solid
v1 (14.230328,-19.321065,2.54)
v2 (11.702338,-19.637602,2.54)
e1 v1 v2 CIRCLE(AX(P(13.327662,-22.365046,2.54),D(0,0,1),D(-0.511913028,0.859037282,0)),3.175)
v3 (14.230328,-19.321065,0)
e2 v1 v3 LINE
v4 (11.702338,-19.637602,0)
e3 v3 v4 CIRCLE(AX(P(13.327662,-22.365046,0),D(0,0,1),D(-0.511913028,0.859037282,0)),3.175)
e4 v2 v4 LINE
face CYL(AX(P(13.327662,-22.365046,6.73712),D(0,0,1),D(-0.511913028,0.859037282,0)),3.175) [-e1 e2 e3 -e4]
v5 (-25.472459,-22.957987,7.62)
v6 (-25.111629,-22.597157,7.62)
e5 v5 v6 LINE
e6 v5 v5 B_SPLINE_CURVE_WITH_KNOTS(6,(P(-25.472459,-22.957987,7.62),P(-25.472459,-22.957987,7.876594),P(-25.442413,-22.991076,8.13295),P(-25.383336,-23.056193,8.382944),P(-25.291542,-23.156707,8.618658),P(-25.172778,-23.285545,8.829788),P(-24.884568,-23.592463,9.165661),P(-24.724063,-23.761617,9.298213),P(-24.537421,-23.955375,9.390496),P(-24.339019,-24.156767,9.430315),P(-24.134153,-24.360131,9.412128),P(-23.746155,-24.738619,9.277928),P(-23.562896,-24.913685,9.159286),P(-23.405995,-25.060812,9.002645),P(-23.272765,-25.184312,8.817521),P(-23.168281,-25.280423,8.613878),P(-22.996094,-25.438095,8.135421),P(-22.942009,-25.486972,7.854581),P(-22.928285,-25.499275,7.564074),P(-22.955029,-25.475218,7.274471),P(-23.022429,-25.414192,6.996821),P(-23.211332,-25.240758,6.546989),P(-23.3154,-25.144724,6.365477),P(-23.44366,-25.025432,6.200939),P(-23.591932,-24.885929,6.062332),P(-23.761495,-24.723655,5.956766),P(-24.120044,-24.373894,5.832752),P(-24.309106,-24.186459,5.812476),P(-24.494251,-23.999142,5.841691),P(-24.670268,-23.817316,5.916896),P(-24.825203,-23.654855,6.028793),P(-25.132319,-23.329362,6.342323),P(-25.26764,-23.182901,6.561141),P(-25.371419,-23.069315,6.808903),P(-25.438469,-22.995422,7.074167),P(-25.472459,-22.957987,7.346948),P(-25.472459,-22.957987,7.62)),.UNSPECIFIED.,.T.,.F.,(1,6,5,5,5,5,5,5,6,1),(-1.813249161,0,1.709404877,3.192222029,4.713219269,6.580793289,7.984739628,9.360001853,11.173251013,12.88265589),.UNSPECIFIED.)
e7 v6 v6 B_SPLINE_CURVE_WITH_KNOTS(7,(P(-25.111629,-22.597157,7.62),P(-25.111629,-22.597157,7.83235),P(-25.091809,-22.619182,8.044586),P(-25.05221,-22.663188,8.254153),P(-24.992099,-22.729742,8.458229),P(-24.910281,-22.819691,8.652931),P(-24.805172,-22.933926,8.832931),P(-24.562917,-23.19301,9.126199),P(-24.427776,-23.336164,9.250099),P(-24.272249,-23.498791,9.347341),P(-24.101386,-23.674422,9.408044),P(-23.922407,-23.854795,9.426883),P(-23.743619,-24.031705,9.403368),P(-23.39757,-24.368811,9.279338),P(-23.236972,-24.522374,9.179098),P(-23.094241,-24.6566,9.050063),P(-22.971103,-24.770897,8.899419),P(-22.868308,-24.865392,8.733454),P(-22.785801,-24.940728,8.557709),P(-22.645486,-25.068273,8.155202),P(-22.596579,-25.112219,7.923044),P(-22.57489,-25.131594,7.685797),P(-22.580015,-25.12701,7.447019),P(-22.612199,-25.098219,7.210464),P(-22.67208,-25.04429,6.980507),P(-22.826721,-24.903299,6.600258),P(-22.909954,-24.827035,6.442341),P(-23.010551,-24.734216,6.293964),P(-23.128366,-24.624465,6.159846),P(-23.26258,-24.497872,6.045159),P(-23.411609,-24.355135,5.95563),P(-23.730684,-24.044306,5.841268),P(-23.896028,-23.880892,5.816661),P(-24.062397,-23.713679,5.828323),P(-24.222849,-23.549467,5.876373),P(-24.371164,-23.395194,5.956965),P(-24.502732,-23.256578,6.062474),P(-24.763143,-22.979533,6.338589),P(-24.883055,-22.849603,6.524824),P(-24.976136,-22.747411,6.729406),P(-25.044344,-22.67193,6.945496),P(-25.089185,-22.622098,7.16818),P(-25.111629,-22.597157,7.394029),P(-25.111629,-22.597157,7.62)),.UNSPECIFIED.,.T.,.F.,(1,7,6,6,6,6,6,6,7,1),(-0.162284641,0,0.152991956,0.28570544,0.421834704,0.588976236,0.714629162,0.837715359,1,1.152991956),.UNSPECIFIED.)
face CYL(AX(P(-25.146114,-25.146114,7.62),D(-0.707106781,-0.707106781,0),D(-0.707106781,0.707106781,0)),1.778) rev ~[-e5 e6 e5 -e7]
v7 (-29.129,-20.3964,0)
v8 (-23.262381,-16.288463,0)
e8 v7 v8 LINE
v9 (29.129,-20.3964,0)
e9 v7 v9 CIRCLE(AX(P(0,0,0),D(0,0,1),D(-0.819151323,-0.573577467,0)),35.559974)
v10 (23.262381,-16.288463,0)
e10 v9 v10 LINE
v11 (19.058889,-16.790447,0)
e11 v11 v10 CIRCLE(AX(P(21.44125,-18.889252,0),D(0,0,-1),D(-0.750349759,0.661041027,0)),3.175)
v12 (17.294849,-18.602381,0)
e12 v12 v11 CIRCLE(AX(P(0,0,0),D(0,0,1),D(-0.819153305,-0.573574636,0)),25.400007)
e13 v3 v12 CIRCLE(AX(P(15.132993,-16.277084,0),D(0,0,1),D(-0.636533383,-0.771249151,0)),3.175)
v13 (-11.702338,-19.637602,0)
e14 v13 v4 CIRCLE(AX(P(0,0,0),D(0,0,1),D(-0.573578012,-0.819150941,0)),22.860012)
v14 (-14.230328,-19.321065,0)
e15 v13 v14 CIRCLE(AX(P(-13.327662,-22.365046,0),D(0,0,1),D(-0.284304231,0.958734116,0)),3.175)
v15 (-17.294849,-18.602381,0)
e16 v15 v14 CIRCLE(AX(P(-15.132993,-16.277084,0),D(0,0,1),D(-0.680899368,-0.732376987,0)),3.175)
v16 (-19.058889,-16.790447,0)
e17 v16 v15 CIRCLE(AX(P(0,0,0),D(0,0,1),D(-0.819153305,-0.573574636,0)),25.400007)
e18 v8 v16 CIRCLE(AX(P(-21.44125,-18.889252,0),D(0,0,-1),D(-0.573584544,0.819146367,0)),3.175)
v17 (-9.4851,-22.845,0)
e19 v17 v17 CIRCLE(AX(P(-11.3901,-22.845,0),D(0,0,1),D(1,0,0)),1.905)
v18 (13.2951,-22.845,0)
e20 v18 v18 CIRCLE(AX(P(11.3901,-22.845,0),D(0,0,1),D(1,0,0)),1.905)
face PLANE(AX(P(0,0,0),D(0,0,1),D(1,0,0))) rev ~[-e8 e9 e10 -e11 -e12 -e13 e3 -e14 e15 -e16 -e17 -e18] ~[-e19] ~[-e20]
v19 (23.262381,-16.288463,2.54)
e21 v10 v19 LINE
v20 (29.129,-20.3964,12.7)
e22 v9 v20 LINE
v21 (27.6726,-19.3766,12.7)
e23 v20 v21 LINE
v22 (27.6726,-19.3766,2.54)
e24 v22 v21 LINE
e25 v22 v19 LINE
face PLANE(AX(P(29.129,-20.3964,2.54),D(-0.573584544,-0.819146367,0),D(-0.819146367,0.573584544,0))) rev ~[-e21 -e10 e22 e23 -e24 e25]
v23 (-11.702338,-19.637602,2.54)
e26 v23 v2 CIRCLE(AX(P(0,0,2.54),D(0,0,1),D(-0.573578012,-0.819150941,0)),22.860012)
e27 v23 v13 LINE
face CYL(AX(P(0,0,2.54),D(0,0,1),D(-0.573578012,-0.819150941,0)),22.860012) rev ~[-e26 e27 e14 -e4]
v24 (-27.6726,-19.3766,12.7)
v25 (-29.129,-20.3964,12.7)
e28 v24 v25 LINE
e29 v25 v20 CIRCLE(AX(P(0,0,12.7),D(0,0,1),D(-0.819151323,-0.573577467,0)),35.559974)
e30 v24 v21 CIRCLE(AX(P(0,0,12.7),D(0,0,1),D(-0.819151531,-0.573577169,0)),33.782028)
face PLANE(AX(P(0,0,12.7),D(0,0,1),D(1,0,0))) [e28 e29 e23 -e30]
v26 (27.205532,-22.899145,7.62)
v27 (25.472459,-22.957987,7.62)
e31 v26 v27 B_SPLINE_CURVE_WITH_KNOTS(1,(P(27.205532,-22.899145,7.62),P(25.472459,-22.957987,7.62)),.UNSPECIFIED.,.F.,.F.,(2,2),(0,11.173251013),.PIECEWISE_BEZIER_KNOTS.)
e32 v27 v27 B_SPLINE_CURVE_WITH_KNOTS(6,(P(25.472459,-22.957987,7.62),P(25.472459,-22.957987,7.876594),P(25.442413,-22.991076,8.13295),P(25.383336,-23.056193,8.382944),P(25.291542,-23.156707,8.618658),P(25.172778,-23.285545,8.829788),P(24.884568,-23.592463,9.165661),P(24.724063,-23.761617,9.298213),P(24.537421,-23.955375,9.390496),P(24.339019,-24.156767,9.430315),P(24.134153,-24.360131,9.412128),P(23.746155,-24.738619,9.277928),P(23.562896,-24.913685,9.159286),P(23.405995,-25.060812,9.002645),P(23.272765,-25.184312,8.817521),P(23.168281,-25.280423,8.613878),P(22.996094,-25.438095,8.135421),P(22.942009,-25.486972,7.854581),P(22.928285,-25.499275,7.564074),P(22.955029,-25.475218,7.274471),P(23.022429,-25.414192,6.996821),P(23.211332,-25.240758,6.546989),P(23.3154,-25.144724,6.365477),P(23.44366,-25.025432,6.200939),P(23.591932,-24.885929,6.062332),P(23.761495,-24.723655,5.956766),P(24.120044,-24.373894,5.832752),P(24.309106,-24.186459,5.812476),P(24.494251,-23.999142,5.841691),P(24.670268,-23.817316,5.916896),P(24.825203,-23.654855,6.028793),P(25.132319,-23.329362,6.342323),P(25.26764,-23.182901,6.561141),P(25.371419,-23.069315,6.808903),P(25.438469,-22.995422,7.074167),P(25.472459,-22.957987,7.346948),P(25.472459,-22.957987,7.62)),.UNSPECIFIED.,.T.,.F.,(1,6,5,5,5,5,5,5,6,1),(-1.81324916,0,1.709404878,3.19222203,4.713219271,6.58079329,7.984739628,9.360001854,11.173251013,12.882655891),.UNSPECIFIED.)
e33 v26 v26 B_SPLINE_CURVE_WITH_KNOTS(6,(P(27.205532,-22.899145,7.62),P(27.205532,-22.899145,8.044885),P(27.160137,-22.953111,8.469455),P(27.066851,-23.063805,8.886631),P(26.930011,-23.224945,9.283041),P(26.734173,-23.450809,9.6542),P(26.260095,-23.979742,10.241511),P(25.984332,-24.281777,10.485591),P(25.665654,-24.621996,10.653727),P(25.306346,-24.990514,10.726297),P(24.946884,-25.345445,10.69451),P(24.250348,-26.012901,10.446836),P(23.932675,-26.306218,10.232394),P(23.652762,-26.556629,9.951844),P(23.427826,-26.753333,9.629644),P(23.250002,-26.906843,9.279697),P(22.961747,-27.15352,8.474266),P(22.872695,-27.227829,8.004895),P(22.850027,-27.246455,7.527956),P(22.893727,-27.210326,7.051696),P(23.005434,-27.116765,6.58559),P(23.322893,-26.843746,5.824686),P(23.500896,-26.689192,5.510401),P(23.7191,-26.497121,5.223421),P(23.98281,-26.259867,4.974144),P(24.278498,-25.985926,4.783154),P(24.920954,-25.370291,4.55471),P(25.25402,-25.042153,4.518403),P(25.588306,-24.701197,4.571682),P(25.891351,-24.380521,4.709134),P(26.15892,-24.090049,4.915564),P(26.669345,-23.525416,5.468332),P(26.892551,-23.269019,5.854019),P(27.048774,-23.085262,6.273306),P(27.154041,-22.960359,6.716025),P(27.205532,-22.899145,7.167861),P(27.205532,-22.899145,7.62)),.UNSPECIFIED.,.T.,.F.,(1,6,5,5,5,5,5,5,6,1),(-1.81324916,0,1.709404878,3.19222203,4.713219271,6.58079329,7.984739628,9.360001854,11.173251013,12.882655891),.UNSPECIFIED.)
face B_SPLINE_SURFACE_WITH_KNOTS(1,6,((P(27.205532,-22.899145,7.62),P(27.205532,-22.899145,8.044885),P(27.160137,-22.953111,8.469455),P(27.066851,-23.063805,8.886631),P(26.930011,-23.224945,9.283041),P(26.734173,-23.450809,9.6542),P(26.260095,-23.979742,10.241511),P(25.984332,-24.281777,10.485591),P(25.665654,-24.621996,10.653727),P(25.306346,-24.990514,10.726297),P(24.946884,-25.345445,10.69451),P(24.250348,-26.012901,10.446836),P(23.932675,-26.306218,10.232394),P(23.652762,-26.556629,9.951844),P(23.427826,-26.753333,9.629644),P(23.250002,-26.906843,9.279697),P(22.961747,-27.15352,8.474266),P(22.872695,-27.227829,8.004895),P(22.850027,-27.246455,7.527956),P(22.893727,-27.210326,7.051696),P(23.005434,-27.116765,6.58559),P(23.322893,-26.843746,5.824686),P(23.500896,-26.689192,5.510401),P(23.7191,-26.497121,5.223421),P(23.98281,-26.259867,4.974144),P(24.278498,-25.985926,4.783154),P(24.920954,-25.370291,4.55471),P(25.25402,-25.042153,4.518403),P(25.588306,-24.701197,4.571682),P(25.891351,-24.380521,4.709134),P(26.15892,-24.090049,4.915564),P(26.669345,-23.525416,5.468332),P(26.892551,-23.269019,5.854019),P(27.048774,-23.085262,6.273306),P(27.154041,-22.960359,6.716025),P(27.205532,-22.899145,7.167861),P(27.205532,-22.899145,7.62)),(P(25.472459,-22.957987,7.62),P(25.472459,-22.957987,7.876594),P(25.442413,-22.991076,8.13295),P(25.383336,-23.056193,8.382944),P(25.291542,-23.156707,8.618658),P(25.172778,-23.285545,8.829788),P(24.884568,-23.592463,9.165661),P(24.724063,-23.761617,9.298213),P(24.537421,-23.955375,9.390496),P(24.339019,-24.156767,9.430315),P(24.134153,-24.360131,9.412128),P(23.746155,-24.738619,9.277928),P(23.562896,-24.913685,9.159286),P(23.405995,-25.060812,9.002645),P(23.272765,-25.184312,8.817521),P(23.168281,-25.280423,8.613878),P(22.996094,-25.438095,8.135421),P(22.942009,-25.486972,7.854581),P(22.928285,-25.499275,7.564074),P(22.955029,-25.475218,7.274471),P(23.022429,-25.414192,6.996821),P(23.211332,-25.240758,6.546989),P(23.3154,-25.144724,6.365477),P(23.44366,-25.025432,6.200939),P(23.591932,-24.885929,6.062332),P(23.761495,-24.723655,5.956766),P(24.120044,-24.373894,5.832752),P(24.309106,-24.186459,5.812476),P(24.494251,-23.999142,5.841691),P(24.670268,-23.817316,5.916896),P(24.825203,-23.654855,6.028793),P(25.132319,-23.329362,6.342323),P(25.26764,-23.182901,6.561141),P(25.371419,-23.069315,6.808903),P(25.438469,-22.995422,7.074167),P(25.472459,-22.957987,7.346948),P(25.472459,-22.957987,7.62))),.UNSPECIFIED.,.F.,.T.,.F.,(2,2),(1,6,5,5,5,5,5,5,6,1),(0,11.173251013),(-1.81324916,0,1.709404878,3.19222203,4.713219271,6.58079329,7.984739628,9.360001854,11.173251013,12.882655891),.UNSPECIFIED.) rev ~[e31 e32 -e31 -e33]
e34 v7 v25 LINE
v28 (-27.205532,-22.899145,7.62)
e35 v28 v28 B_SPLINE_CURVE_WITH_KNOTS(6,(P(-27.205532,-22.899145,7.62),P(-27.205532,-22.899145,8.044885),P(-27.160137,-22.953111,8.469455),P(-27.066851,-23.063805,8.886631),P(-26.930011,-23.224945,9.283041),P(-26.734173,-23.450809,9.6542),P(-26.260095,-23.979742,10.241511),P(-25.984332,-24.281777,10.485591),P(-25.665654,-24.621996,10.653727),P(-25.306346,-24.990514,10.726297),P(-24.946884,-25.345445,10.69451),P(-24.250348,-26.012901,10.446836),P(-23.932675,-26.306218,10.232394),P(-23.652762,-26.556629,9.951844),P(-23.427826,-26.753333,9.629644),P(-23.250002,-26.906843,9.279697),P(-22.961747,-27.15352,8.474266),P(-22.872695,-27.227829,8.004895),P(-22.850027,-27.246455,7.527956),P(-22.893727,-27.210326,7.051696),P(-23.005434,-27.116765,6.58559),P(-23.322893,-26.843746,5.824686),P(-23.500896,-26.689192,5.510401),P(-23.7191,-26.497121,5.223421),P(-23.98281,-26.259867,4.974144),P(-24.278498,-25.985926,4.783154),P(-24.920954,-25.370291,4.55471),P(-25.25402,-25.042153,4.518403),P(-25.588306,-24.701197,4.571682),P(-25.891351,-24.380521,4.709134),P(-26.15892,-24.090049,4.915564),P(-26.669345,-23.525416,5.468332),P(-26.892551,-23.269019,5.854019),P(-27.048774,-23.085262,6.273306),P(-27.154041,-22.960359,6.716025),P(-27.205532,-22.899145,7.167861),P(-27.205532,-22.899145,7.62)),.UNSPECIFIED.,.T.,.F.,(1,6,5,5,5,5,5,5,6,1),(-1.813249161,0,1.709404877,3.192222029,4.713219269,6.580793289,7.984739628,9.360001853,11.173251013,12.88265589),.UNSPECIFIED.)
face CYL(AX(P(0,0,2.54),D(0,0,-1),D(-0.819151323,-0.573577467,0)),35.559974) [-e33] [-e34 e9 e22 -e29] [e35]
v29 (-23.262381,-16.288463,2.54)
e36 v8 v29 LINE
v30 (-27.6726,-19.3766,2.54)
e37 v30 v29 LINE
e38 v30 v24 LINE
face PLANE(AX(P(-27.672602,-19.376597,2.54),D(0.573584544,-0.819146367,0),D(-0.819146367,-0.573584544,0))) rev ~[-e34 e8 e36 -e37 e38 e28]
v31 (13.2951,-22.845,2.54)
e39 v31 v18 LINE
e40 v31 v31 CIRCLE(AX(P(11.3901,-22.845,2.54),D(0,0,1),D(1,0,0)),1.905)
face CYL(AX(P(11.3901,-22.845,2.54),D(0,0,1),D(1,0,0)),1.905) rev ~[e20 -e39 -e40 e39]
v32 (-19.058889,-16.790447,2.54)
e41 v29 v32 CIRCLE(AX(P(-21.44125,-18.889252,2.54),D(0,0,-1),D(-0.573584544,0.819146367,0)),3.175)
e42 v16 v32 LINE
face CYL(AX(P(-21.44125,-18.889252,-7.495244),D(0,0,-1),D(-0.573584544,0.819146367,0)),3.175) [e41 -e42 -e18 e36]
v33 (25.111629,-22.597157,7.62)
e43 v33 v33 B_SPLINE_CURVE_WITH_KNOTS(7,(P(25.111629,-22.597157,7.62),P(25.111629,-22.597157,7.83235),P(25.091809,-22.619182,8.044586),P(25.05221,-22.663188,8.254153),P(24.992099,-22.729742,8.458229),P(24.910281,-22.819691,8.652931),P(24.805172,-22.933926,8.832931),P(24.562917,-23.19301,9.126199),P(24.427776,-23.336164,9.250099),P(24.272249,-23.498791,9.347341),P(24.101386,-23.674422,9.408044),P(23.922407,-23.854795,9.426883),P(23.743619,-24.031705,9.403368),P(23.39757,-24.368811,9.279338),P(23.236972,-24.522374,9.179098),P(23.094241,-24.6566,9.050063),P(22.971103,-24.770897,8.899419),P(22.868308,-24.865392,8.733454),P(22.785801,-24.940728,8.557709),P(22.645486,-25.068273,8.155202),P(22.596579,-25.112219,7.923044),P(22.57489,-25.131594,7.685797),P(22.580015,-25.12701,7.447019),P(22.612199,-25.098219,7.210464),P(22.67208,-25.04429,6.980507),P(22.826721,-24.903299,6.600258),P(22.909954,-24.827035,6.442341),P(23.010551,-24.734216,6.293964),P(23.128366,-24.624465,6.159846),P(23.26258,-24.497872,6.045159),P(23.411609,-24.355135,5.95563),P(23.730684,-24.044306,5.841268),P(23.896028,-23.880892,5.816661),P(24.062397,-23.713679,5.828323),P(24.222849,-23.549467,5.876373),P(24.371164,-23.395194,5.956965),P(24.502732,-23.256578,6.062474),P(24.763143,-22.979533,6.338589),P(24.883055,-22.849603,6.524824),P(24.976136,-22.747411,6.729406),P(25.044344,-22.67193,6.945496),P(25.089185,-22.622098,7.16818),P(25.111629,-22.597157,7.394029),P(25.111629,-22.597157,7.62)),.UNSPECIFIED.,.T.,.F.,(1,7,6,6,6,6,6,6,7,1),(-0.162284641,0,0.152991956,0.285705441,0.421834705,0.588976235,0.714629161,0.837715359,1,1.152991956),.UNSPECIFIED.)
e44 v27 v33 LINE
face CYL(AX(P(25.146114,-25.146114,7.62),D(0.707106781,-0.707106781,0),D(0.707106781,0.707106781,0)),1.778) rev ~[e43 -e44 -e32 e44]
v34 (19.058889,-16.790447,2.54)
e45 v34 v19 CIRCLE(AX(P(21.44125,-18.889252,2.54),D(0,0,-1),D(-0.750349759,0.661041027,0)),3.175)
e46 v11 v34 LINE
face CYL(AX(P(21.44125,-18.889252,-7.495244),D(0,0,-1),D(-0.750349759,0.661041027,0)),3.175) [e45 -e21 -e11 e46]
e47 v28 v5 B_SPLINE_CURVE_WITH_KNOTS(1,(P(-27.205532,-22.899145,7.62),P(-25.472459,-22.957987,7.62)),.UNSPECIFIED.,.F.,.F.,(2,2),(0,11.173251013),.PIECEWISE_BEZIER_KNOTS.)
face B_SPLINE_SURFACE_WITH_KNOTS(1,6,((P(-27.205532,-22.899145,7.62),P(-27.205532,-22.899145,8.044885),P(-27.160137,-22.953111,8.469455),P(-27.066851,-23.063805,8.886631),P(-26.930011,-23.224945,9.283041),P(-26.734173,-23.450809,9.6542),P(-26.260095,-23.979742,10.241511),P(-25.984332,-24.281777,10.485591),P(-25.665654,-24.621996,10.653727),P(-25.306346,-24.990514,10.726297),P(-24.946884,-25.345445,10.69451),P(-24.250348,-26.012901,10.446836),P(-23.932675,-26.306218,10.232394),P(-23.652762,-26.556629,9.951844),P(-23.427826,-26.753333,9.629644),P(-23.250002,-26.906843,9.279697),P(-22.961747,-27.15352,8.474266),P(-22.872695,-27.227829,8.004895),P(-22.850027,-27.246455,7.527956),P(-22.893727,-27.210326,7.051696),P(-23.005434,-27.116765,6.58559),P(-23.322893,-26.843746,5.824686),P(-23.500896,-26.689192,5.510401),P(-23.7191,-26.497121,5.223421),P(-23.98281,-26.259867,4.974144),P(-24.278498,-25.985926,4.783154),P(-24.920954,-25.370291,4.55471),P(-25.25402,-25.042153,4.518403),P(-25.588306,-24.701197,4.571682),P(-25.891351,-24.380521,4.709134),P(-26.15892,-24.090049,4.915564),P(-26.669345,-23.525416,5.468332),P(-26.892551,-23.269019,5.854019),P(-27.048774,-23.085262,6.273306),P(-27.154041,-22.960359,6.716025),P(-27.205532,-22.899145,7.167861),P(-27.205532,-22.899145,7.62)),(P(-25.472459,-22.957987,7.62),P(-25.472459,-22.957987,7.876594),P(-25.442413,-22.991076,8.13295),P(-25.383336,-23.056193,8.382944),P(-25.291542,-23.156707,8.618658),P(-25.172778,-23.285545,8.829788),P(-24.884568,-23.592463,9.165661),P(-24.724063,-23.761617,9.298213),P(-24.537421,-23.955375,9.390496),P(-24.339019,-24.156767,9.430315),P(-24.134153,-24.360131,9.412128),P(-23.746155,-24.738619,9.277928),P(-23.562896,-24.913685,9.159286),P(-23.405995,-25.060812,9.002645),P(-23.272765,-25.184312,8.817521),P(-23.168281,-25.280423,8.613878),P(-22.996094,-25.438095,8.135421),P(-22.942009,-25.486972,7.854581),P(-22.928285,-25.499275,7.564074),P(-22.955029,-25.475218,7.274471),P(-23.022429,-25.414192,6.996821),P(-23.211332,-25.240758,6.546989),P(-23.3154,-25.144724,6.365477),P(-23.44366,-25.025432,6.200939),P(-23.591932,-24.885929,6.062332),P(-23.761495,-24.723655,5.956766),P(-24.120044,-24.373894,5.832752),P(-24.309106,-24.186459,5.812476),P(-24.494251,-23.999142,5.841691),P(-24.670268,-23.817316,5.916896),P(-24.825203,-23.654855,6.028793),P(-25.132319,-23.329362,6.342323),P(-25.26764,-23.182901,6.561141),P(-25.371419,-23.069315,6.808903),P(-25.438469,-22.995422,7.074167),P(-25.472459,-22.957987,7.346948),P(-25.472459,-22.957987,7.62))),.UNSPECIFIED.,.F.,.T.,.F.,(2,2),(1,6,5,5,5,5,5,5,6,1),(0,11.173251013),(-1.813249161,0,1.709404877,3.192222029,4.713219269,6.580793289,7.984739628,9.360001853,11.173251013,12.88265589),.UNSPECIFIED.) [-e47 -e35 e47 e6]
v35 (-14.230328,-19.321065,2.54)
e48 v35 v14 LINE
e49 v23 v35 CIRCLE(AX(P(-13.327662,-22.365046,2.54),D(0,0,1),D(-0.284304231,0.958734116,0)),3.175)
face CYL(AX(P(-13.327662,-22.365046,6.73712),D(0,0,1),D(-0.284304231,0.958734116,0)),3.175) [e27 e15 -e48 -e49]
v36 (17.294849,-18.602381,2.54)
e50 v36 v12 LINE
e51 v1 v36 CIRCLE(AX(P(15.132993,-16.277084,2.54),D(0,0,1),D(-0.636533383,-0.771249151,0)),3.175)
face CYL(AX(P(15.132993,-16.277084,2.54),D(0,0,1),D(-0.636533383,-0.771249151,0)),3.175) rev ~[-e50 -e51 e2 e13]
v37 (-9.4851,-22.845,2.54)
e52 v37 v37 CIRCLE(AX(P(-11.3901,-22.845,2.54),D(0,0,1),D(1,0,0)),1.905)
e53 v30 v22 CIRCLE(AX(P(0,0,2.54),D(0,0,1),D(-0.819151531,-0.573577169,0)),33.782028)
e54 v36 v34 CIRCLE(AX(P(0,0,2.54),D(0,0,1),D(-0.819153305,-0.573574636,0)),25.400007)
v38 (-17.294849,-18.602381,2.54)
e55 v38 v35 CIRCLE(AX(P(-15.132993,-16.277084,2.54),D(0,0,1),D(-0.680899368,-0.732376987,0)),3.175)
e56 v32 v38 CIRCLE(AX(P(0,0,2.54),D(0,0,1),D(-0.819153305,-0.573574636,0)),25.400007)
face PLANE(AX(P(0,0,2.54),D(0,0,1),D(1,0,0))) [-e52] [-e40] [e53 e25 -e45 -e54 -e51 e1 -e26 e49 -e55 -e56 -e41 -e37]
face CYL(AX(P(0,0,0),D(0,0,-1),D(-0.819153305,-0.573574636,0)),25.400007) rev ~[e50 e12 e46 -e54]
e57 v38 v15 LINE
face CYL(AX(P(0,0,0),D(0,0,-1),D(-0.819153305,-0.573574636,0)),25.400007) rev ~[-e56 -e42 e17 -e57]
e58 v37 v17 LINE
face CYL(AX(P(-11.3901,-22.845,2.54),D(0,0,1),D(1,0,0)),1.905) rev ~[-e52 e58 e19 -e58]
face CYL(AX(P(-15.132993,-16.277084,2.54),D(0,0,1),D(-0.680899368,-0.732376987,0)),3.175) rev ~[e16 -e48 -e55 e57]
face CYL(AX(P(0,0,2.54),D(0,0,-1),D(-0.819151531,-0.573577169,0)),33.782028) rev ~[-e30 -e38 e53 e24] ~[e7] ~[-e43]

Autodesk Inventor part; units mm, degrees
ref_plane "XZ Plane" through (0, 0, 0) normal (0, 1, 0) x (-1, 0, 0)
sketch "Sketch1" plane through (0, 0, 0) normal (0, 0, 1) x (1, 0, 0)
  arc A0 (-20.8065, -14.5688) -> (20.8065, -14.5688) centre (0, 0) ccw
  arc A1 (-29.129, -20.3964) -> (29.129, -20.3964) centre (0, 0) ccw
  line L0 (-29.129, -20.3964) -> (-20.8065, -14.5688)
  line L1 (29.129, -20.3964) -> (20.8065, -14.5688)
  line L2 (-20.8065, -14.5688) -> (20.8065, -14.5688) construction
  dimension "d0" = 50.8
  dimension "d2" = 71.12
  dimension "d3" = 110
extrude "Extrusion1" add sketch "Sketch1" along normal blind 2.54
sketch "Sketch2" plane through (0, 0, 2.54) normal (0, 0, 1) x (1, 0, 0)
  arc A0 (-20.8065, -14.5688) -> (20.8065, -14.5688) centre (0, 0) ccw projected
  line L0 (-14.5688, -20.8065) -> (-13.112, -18.7258)
  line L1 (14.5688, -20.8065) -> (13.112, -18.7258)
  arc A1 (-13.112, -18.7258) -> (13.112, -18.7258) centre (0, 0) ccw
  line L2 (-14.5688, -20.8065) -> (14.5688, -20.8065) construction
  dimension "d6" = 2.54
  dimension "d13" = 70
extrude "Extrusion2" add sketch "Sketch2" against normal blind 2.54
sketch "Sketch3" plane through (0, 0, 2.54) normal (0, 0, 1) x (1, 0, 0)
  circle A0 centre (-11.3901, -22.845) radius 1.905
  circle A1 centre (11.3901, -22.845) radius 1.905
  line L0 (-11.3901, -22.845) -> (11.3901, -22.845) construction
  point P0 (0, 0)
  point P1 (0, -22.845)
  dimension "d9" = 3.81
  dimension "d10" = 3.81
  dimension "d11" = 25.527
  dimension "d12" = 26.5
extrude "Extrusion3" cut sketch "Sketch3" against normal through all
sketch "Sketch4" plane through (0, 0, 2.54) normal (0, 0, 1) x (1, 0, 0)
  circle A0 centre (-11.3901, -22.845) radius 1.905 projected
  circle A1 centre (11.3901, -22.845) radius 1.905 projected
  arc A2 (-29.129, -20.3964) -> (29.129, -20.3964) centre (0, 0) ccw projected
  line L0 (29.129, -20.3964) -> (20.8065, -14.5688) projected
  arc A3 (14.5688, -20.8065) -> (20.8065, -14.5688) centre (0, 0) ccw projected
  line L1 (14.5688, -20.8065) -> (13.112, -18.7258) projected
  arc A4 (-13.112, -18.7258) -> (13.112, -18.7258) centre (0, 0) ccw projected
  line L2 (-13.112, -18.7258) -> (-14.5688, -20.8065) projected
  arc A5 (-20.8065, -14.5688) -> (-14.5688, -20.8065) centre (0, 0) ccw projected
  line L3 (-20.8065, -14.5688) -> (-29.129, -20.3964) projected
  line L4 (-20.8065, -14.5688) -> (-29.129, -20.3964) projected
  line L5 (29.129, -20.3964) -> (20.8065, -14.5688) projected
  arc A6 (-27.6726, -19.3766) -> (27.6726, -19.3766) centre (0, 0) ccw
  dimension "d17" = 67.564
extrude "Extrusion4" add sketch "Sketch4" along normal blind 10.16 contours L3 A6 L0 A2
ref_plane "Work Plane2" through (25.1447, -25.1447, 0) normal (0.7071068, -0.7071068, 0) x (0.7071068, 0.7071068, 0)
ref_plane "Work Plane1" through (0, 0, 2.54) normal (0.7071068, -0.7071068, 0) x (0, 0, -1)
ref_plane "Work Plane4" through (-25.1447, -25.1447, 0) normal (0.7071068, 0.7071068, 0) x (-0.7071068, 0.7071068, 0)
ref_plane "Work Plane3" through (0, 0, 2.54) normal (0.7071068, 0.7071068, 0) x (0, 0, -1)
sketch "Sketch5" plane through (-25.1447, -25.1447, 0) normal (0.7071068, 0.7071068, 0) x (-0.7071068, 0.7071068, 0)
  circle A0 centre (0, 7.62) radius 1.778
  line L0 (5.8662, 2.54) -> (5.8662, 12.7) projected
  point P0 (0, 0)
  point P1 (6.1749, 4.826)
  point P2 (5.8662, 7.62)
  dimension "d22" = 3.556
extrude "Extrusion5" cut sketch "Sketch5" along normal blind 7.112
sketch "Sketch6" plane through (25.1447, -25.1447, 0) normal (0.7071068, -0.7071068, 0) x (0.7071068, 0.7071068, 0)
  circle A0 centre (0, 7.62) radius 1.778
  line L0 (5.8662, 2.54) -> (5.8662, 12.7) projected
  point P0 (0, 0)
  point P1 (6.1749, 4.826)
  point P2 (5.8662, 7.62)
  dimension "d25" = 3.556
extrude "Extrusion6" cut sketch "Sketch6" against normal blind 7.112
fillet "Fillet1" radius 3.175 6 edges at (-20.8065, -14.5688, 1.27) (-14.5688, -20.8065, 1.27) (-13.112, -18.7258, 1.27) (13.112, -18.7258, 1.27) (14.5688, -20.8065, 1.27) (20.8065, -14.5688, 1.27)
chamfer "Chamfer1" distance 1.27 angle 45 2 edges at (-23.856, -26.3705, 7.6201) (23.856, -26.3705, 7.6201)
properties part number "BearingMountBrace" material "ABS Plastic"
